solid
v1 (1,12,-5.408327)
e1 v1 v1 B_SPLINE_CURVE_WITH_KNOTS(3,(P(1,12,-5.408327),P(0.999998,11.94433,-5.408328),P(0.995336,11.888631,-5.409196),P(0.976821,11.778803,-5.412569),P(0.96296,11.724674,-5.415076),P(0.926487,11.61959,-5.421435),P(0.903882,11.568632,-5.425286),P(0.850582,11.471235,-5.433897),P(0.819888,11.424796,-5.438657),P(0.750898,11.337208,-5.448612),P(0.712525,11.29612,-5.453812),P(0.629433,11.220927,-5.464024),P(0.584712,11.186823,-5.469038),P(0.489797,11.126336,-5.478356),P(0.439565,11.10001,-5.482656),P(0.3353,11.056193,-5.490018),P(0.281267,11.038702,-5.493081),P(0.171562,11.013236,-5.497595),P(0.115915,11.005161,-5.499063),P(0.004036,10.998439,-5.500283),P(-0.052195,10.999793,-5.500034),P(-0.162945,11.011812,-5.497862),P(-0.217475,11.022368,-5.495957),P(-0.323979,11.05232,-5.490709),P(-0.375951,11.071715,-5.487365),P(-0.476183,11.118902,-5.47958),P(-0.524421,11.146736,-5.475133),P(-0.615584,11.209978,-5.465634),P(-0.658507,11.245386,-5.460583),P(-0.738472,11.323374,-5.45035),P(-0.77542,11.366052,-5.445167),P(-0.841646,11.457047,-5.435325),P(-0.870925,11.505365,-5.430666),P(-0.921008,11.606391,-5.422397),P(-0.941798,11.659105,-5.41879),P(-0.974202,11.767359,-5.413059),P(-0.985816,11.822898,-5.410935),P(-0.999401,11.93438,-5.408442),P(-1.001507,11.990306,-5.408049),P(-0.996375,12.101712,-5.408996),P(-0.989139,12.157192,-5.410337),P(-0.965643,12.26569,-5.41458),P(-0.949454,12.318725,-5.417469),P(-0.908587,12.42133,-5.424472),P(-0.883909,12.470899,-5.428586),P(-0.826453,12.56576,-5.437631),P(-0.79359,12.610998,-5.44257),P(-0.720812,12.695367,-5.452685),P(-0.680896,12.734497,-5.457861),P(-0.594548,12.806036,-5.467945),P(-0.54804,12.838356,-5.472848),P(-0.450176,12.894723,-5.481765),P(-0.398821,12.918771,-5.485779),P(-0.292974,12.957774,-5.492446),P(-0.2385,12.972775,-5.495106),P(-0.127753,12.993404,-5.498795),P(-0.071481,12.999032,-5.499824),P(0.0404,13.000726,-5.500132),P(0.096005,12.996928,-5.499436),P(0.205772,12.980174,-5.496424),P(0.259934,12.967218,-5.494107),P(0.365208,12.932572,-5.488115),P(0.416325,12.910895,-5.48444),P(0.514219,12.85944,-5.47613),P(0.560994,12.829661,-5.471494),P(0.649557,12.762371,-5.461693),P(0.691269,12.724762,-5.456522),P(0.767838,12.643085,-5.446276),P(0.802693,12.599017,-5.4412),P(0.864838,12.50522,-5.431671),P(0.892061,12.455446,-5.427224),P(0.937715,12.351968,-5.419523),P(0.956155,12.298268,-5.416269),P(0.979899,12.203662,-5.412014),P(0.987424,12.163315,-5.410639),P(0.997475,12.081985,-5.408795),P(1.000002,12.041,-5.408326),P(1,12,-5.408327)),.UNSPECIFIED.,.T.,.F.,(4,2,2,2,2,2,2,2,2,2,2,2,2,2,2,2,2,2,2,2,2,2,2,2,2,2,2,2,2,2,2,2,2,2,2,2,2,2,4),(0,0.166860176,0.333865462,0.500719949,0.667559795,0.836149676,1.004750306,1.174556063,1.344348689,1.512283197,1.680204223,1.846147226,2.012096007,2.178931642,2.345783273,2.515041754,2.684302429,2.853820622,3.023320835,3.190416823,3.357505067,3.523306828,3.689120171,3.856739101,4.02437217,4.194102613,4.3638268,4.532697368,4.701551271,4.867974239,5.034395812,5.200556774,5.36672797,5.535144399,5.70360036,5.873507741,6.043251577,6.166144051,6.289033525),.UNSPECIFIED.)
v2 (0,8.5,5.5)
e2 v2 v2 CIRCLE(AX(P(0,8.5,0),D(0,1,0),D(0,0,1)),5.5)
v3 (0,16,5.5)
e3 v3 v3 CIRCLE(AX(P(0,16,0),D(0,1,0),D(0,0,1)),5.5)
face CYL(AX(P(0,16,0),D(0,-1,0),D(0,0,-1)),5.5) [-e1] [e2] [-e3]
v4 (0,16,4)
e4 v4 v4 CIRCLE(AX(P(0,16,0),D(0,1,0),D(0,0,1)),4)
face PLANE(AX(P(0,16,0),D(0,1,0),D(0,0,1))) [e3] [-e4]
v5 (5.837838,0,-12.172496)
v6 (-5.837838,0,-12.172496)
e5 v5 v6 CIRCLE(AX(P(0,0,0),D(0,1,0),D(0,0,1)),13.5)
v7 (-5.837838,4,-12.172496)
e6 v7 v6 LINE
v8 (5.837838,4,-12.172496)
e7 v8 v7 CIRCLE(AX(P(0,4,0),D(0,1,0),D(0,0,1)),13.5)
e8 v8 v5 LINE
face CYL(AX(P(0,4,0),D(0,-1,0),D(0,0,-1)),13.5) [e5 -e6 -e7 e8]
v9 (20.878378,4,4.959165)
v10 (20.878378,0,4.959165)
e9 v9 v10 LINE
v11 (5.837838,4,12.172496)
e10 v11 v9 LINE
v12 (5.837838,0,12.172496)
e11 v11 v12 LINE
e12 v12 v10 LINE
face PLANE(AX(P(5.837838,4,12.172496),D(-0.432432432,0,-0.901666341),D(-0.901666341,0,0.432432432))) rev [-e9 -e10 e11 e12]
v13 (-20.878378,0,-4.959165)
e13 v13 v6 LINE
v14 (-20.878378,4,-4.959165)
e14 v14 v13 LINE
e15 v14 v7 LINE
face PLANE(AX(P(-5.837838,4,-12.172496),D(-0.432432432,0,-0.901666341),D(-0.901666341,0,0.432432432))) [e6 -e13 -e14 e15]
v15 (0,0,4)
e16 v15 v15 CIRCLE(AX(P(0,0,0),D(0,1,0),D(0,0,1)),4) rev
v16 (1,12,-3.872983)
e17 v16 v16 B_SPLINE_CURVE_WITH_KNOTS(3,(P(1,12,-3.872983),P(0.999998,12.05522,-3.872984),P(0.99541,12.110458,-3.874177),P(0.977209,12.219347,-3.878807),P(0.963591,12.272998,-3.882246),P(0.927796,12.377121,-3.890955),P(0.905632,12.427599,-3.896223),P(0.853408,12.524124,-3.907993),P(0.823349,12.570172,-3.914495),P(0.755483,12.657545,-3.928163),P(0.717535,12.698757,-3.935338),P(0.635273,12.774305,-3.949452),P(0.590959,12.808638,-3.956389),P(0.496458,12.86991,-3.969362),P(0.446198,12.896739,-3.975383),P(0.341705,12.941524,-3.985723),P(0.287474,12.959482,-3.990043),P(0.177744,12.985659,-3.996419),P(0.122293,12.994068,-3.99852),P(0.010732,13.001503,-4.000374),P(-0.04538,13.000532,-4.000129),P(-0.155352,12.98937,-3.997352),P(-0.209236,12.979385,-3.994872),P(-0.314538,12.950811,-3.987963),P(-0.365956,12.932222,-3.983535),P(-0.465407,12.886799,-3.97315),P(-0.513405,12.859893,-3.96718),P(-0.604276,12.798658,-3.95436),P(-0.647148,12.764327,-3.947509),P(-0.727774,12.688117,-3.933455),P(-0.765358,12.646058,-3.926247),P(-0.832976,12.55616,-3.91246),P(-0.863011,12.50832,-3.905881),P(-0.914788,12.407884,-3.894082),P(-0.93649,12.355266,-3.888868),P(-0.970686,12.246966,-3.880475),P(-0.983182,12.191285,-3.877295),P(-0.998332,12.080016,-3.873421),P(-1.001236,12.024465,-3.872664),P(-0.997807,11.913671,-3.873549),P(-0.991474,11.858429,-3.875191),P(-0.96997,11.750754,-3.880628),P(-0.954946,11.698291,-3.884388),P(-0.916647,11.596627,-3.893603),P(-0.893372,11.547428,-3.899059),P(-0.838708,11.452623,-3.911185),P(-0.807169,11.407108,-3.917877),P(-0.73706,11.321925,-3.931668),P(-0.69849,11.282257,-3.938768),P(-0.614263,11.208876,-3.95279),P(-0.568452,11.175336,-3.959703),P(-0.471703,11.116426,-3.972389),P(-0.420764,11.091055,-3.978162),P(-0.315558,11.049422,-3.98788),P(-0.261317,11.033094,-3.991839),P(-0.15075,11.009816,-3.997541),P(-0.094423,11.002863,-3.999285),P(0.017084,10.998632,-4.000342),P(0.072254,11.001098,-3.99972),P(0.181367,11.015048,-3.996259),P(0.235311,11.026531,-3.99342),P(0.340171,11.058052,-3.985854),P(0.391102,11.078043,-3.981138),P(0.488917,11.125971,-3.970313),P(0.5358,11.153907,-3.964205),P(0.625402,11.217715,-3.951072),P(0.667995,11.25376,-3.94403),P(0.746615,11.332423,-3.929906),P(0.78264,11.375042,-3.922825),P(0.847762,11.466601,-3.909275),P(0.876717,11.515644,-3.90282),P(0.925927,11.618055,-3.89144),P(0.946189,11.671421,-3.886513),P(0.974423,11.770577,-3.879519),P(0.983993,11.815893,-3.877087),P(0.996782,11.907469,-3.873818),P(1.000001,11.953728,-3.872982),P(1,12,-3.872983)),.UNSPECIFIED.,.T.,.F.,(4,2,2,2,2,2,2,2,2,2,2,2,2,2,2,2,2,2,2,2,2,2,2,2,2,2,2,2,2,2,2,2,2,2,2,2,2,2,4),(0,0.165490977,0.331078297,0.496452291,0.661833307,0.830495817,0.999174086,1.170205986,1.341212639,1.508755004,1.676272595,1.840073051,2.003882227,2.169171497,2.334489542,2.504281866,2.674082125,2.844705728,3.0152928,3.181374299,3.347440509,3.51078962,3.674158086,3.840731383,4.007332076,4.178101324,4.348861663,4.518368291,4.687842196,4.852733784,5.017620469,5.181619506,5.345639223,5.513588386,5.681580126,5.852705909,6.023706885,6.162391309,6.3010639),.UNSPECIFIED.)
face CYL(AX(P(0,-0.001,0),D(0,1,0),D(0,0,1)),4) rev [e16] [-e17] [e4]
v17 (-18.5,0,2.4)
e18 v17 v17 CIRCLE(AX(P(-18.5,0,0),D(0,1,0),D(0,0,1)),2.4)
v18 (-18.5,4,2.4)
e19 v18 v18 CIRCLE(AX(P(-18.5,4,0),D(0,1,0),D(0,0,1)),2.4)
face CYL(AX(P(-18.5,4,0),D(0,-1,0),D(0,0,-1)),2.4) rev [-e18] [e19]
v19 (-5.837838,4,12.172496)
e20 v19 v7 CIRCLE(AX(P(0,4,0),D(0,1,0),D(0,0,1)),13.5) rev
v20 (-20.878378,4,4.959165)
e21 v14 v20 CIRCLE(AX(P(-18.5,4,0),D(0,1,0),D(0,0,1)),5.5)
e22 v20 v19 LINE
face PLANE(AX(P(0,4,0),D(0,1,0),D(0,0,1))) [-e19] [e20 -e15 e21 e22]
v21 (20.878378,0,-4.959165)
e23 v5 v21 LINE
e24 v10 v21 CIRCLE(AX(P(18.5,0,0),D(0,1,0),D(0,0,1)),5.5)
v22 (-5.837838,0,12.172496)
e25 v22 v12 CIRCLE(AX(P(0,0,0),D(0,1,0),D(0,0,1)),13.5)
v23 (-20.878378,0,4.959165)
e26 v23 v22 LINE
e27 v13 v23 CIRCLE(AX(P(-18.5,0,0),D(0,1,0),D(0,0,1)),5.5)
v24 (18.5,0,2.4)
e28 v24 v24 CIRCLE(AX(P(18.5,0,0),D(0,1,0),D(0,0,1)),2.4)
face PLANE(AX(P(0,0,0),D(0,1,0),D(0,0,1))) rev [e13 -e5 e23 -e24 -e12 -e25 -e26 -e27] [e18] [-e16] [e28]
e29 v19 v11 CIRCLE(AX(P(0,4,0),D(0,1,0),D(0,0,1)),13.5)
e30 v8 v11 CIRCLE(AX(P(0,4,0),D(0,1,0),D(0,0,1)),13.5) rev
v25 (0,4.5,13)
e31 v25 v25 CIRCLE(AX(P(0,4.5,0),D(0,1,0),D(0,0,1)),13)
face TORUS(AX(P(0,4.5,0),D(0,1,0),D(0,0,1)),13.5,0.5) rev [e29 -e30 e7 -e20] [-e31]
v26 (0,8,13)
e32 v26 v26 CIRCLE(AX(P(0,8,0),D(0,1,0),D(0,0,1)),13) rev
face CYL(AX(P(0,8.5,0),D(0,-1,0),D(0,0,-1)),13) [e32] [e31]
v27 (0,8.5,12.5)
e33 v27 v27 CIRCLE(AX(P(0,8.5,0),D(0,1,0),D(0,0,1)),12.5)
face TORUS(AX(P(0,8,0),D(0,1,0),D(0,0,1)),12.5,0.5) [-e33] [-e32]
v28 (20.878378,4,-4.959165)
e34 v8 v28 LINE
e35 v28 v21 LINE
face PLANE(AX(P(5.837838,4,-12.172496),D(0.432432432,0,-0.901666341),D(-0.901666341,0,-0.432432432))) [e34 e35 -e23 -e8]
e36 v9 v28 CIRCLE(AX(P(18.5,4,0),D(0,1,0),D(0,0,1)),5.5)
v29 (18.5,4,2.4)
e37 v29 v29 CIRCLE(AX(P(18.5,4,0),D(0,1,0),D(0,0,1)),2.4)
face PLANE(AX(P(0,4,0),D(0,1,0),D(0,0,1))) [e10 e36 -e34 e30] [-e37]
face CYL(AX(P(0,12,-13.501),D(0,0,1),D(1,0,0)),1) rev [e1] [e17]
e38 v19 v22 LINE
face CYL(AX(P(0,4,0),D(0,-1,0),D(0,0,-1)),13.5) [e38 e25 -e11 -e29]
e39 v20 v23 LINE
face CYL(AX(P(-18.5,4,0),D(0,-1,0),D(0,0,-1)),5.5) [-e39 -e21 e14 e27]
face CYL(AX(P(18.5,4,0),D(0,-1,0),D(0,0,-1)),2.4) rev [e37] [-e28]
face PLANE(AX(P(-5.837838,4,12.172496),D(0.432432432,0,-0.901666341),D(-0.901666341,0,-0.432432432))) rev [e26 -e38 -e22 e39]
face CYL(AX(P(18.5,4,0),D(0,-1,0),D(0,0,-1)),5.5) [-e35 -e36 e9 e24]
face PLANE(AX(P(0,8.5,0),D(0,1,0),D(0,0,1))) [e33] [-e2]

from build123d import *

# Parameters (mm, degrees)
SKETCH_1_R               = 2.4
EXTRUDE_1_DEPTH          = 4
SKETCH_2_R               = 13
EXTRUDE_2_DEPTH          = 4.5
SKETCH_3_R               = 5.5
EXTRUDE_3_DEPTH          = 7.5
CUT_EXTRUDE_1_REACH      = 33.847
SKETCH_4_R               = 4
FILLET_1_R               = 0.5
CUT_EXTRUDE_2_REACH      = 33.847
CUT_EXTRUDE_2_END_RADIUS = 5.5
SKETCH_6_R               = 1


with BuildPart() as part:
    # 草图1 → 凸台-拉伸1 (new body)
    with BuildSketch(Plane(origin=(0, 0, 0), x_dir=(1, 0, 0), z_dir=(0, 1, 0))):
        with BuildLine():
            Line((-5.837837838, 12.17249561), (-20.878378378, 4.959164878))
            ThreePointArc((-20.878378378, 4.959164878), (-24, 0), (-20.878378378, -4.959164878))
            Line((-20.878378378, -4.959164878), (-5.837837838, -12.17249561))
            ThreePointArc((-5.837837838, -12.17249561), (0, -13.5), (5.837837838, -12.17249561))
            Line((5.837837838, -12.17249561), (20.878378378, -4.959164878))
            ThreePointArc((20.878378378, -4.959164878), (24, 0), (20.878378378, 4.959164878))
            Line((20.878378378, 4.959164878), (5.837837838, 12.17249561))
            ThreePointArc((5.837837838, 12.17249561), (0, 13.5), (-5.837837838, 12.17249561))
        make_face()
        with Locations(Location((-18.5, 0, 0), (0, 0, 270))):
            Circle(SKETCH_1_R, mode=Mode.SUBTRACT)
        with Locations(Location((18.5, 0, 0), (0, 0, 270))):
            Circle(SKETCH_1_R, mode=Mode.SUBTRACT)
    extrude(amount=EXTRUDE_1_DEPTH)

    # 草图2 → 凸台-拉伸2 (add)
    with BuildSketch(Plane(origin=(0, 4, 0), x_dir=(1, 0, 0), z_dir=(0, 1, 0))):
        with Locations(Location((0, 0, 0), (0, 0, 270))):
            Circle(SKETCH_2_R)
    extrude(amount=EXTRUDE_2_DEPTH)

    # 草图3 → 凸台-拉伸3 (add)
    with BuildSketch(Plane(origin=(0, 8.5, 0), x_dir=(1, 0, 0), z_dir=(0, 1, 0))):
        with Locations(Location((0, 0, 0), (0, 0, 270))):
            Circle(SKETCH_3_R)
    extrude(amount=EXTRUDE_3_DEPTH)

    # 草图4 → 切除-拉伸1 (cut, up to next)
    with BuildSketch(Plane(origin=(0, 16, 0), x_dir=(1, 0, 0), z_dir=(0, 1, 0)), mode=Mode.PRIVATE) as cut_extrude_1_sk1:
        with Locations(Location((0, 0, 0), (0, 0, 270))):
            Circle(SKETCH_4_R)
    cut_extrude_1_tool1 = extrude(cut_extrude_1_sk1.sketch, amount=-CUT_EXTRUDE_1_REACH, mode=Mode.PRIVATE) & part.part
    add(cut_extrude_1_tool1.solids().sort_by_distance((0, 16, 0))[0], mode=Mode.SUBTRACT)

    # 圆角1
    fillet_1_edges = [part.edges().sort_by_distance(p)[0] for p in [
        (0, 4, -13),
        (0, 8.5, -13),
    ]]
    fillet(fillet_1_edges, radius=FILLET_1_R - 0.0001)  # a hair under: the kernel refuses the full size

    # 切除-拉伸2: up to this cylinder (the profile starts inside it)
    cut_extrude_2_end = Plane(origin=(0, 12, 0), z_dir=(0, -1, 0)) * Cylinder(CUT_EXTRUDE_2_END_RADIUS, 79.694, mode=Mode.PRIVATE)
    # 草图6 → 切除-拉伸2 (cut, up to the surface)
    with BuildSketch(Plane.XY, mode=Mode.PRIVATE) as cut_extrude_2_sk1:
        with Locations((0, 12)):
            Circle(SKETCH_6_R)
    cut_extrude_2_tool1 = extrude(cut_extrude_2_sk1.sketch, amount=-CUT_EXTRUDE_2_REACH, mode=Mode.PRIVATE) & cut_extrude_2_end
    add(cut_extrude_2_tool1.solids().sort_by_distance((0, 12, 0))[0], mode=Mode.SUBTRACT)


solid = part.part
